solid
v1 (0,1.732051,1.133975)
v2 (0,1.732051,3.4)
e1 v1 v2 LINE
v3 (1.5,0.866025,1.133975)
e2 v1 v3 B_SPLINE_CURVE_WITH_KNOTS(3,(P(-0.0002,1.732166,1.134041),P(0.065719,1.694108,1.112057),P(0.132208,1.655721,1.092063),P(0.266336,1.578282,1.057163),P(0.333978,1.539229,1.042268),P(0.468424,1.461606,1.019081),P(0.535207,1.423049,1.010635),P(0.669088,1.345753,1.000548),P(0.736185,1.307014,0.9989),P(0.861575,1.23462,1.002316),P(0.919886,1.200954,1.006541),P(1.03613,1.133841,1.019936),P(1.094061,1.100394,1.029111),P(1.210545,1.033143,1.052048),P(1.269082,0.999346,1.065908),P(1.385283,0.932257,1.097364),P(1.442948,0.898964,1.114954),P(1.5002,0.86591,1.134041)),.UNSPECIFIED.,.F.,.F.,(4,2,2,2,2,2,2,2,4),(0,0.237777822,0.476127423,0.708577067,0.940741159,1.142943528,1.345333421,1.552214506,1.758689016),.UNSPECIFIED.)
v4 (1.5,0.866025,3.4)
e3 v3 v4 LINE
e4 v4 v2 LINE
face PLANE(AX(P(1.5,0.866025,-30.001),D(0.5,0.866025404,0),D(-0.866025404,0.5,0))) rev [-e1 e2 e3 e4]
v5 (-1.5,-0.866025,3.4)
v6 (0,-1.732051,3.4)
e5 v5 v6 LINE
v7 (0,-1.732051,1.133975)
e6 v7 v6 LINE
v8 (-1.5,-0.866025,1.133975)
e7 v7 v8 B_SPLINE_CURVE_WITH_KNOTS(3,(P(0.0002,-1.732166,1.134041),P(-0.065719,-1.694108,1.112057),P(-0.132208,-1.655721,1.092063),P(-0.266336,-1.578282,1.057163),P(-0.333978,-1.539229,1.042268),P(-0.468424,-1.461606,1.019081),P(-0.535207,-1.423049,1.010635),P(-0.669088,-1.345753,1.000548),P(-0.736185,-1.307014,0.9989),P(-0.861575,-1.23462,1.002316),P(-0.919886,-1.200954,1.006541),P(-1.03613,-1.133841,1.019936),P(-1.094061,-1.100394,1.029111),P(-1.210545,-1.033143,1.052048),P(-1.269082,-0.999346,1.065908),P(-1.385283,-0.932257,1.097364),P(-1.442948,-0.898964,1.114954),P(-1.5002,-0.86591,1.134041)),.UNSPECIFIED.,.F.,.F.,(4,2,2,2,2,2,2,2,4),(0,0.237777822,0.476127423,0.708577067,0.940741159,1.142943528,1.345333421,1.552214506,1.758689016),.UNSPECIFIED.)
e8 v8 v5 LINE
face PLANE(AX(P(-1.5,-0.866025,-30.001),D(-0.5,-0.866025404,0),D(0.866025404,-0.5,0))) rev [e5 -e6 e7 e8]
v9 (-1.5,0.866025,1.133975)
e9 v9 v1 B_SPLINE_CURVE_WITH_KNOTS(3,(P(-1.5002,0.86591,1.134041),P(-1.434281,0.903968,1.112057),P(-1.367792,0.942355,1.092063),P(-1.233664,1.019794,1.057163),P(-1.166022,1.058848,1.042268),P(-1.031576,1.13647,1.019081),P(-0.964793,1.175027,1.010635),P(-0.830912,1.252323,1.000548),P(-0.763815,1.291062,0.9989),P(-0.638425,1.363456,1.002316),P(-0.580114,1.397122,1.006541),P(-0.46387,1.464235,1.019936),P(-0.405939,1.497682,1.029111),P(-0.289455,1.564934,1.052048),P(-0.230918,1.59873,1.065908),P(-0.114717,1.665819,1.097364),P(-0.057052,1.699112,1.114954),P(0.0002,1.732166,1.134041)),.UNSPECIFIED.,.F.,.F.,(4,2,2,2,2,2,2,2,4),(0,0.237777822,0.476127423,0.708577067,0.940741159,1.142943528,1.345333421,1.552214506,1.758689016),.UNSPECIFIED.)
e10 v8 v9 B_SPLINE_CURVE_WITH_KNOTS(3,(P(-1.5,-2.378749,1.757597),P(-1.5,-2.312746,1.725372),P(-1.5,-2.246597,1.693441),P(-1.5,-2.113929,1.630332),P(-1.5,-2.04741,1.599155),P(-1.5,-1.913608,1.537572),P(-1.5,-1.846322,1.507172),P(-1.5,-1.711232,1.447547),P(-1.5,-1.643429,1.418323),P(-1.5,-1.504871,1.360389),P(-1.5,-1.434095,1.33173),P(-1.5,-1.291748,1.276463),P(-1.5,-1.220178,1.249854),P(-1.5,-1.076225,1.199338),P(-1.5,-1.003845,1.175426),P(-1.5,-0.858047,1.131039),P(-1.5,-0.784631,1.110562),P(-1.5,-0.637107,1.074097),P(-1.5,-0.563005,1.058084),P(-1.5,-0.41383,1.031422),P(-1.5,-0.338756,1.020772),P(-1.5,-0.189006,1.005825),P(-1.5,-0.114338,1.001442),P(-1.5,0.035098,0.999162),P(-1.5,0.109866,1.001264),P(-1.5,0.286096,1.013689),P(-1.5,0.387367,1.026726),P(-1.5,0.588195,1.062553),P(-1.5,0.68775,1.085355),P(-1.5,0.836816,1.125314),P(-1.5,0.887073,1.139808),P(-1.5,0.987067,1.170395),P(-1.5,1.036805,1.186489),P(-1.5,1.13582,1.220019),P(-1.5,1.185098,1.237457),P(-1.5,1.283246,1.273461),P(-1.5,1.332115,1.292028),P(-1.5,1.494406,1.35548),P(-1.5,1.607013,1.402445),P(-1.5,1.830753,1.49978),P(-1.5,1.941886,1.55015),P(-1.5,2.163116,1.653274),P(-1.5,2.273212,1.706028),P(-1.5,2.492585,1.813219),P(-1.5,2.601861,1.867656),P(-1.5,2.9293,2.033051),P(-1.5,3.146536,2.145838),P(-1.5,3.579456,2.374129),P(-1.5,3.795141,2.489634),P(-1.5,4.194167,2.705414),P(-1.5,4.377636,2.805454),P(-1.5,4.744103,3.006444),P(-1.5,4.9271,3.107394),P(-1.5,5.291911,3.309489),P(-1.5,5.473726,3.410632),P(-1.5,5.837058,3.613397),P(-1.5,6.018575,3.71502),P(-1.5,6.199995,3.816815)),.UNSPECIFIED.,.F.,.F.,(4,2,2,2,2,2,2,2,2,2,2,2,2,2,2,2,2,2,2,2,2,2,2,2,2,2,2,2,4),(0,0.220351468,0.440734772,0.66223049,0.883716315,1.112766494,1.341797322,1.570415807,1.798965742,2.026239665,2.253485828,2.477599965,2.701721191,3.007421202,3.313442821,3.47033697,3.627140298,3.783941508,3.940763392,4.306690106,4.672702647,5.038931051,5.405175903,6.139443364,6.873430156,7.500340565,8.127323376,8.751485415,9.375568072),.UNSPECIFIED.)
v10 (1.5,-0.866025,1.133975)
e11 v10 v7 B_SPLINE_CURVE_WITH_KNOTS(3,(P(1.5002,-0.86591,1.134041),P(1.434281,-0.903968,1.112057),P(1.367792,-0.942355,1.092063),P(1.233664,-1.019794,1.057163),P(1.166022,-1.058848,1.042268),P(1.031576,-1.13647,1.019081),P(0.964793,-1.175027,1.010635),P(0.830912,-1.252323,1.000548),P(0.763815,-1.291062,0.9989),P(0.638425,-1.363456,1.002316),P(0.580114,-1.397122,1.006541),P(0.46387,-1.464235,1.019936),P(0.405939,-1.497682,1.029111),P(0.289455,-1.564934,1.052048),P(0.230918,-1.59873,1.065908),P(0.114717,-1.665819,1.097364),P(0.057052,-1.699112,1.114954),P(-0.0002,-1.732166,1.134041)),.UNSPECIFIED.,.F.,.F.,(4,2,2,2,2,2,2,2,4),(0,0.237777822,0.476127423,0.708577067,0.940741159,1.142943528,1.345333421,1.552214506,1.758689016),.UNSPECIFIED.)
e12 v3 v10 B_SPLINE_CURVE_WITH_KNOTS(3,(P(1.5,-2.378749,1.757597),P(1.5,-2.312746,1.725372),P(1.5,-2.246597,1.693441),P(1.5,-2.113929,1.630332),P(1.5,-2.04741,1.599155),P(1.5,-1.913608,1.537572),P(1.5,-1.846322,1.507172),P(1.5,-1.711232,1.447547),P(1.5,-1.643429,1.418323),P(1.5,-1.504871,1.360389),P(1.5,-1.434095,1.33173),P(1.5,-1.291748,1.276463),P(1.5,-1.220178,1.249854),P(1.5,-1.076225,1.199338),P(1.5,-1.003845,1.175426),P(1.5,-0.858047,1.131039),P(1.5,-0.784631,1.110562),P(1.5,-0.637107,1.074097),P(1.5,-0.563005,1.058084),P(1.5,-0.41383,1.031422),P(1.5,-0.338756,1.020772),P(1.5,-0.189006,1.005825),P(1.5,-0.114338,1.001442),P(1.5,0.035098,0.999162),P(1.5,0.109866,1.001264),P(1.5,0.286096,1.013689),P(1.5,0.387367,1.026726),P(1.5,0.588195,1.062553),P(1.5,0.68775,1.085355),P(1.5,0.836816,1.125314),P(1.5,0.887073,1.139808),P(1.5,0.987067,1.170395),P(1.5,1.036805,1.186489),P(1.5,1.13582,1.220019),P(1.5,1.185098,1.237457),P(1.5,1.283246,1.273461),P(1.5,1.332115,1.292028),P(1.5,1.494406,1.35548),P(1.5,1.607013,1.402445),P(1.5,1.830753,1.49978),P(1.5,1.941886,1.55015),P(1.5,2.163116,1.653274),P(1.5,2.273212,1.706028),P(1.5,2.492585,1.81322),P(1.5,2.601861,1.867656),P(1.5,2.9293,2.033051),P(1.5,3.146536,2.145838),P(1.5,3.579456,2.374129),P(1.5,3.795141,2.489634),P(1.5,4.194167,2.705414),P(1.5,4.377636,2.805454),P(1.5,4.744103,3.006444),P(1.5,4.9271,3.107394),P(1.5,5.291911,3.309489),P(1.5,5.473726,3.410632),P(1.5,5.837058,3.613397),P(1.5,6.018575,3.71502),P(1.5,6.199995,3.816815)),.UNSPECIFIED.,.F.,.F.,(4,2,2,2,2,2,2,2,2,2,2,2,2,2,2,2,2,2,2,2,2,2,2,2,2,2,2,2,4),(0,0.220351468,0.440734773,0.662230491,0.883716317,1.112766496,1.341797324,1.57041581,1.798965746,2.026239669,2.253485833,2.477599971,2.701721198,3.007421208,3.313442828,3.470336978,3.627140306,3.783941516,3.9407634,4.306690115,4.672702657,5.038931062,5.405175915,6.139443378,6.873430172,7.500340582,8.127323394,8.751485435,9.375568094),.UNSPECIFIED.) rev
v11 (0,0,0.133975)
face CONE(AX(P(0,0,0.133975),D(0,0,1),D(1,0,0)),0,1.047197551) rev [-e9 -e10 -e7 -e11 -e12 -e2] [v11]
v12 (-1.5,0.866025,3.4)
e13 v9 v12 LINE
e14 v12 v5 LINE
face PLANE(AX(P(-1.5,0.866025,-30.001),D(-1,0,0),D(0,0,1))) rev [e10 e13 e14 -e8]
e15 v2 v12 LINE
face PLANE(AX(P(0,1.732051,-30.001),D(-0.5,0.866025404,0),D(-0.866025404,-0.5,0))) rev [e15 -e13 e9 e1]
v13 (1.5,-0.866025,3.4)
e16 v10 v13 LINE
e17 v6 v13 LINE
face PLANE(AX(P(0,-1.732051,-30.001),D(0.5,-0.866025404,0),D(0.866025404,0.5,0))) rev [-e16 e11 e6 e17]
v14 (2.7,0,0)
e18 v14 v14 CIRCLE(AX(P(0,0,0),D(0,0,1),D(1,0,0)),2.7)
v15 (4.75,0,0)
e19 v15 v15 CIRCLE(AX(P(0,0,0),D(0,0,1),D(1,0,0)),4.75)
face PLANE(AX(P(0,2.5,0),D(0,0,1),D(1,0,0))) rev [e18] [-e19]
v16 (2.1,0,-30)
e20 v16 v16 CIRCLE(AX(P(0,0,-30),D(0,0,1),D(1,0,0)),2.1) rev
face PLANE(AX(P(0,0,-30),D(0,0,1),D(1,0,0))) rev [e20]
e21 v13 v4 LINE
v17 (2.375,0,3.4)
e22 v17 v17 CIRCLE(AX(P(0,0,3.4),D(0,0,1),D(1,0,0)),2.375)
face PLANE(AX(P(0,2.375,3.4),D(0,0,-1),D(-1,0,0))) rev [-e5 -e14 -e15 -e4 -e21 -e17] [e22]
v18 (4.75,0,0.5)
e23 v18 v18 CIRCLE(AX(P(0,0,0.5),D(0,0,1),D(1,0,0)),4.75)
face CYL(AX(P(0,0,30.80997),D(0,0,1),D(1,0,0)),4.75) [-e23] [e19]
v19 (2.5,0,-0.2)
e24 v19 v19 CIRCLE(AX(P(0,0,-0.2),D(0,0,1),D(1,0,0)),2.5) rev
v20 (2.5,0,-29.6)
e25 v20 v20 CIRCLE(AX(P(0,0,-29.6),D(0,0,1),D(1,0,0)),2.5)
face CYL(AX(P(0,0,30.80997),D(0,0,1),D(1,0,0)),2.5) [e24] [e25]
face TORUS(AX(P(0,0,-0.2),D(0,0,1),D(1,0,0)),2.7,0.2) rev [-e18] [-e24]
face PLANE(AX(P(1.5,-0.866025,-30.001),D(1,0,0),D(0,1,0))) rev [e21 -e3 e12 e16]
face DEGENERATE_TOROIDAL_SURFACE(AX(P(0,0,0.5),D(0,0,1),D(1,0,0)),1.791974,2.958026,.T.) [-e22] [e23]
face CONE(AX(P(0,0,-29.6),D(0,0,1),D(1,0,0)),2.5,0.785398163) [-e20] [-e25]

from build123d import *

# Parameters (mm, degrees)
CHAMFER1_SIZE      = 0.4
CUT_EXTRUDE1_START = -2.4000001
CUT_EXTRUDE1_DEPTH = 3.4000001
FILLET1_R          = 0.2


with BuildPart() as part:
    # Sketch1 → Revolve1 (revolve)
    with BuildSketch(Plane(origin=(0, 0, 0), x_dir=(0, 0, -1), z_dir=(1, 0, 0)), mode=Mode.PRIVATE) as revolve1_sk:
        with BuildLine():
            Line((30, 0), (30, 2.5))
            Line((30, 2.5), (0, 2.5))
            Line((0, 2.5), (0, 4.75))
            Line((0, 4.75), (-0.5, 4.75))
            ThreePointArc((-0.5, 4.75), (-2.374208166, 4.080480498), (-3.4, 2.375))
            Line((-3.4, 2.375), (-3.4, 0))
            Line((-3.4, 0), (30, 0))
        make_face()
    revolve(revolve1_sk.sketch.rotate(Axis((0, 0, 30.809969789), (0, 0, -1)), 90), axis=Axis((0, 0, 30.809969789), (0, 0, -1)))

    # Chamfer1
    chamfer1_edges = [part.edges().sort_by_distance(p)[0] for p in [
        (-2.5, 0, -30),
    ]]
    chamfer(chamfer1_edges, length=CHAMFER1_SIZE)

    # Sketch2 → Cut-Revolve1 (revolve, cut)
    with BuildSketch(Plane(origin=(0, 0, 0), x_dir=(0, 0, -1), z_dir=(1, 0, 0)), mode=Mode.PRIVATE) as cut_revolve1_sk:
        Polygon((-3.4, 0), (-3.4, 1.5), (-1, 1.5), (-0.133974596, 0), align=None)
    revolve(cut_revolve1_sk.sketch.rotate(Axis((0, 0, 2.452500839), (0, 0, -1)), 90), axis=Axis((0, 0, 2.452500839), (0, 0, -1)), mode=Mode.SUBTRACT)

    # Cut-Extrude1: read off the stored shape, not the designer's step
    # Cut-Extrude1 outline → Cut-Extrude1 (cut)
    with BuildSketch(Plane.XY.offset(3.4).offset(CUT_EXTRUDE1_START)):
        with BuildLine():
            Line((1.5, 0), (1.5, 0.866025404))
            Line((1.5, 0.866025404), (0.750000011, 1.299038099))
            ThreePointArc((0.750000011, 1.299038099), (1.299038109, 0.749999994), (1.5, 0))
        make_face()
        with BuildLine():
            ThreePointArc((-0.749999993, 1.29903811), (1e-08, 1.5), (0.750000011, 1.299038099))
            Line((0.750000011, 1.299038099), (0, 1.732050808))
            Line((0, 1.732050808), (-0.749999993, 1.29903811))
        make_face()
        with BuildLine():
            Line((1.5, -0.866025404), (1.5, 0))
            ThreePointArc((1.5, 0), (1.299038107, -0.749999997), (0.750000005, -1.299038103))
            Line((0.750000005, -1.299038103), (1.5, -0.866025404))
        make_face()
        with BuildLine():
            ThreePointArc((-1.5, 0), (-1.299038104, 0.750000003), (-0.749999993, 1.29903811))
            Line((-0.749999993, 1.29903811), (-1.5, 0.866025404))
            Line((-1.5, 0.866025404), (-1.5, 0))
        make_face()
        with BuildLine():
            Line((0, -1.732050808), (0.750000005, -1.299038103))
            ThreePointArc((0.750000005, -1.299038103), (3e-09, -1.5), (-0.75, -1.299038106))
            Line((-0.75, -1.299038106), (0, -1.732050808))
        make_face()
        with BuildLine():
            ThreePointArc((-0.75, -1.299038106), (-1.299038106, -0.75), (-1.5, 0))
            Line((-1.5, 0), (-1.5, -0.866025404))
            Line((-1.5, -0.866025404), (-0.75, -1.299038106))
        make_face()
    extrude(amount=CUT_EXTRUDE1_DEPTH, mode=Mode.SUBTRACT)

    # Cut-Extrude1 2 outline → Cut-Extrude1 2 (revolve)
    with BuildSketch(Plane.XZ):
        Polygon((1.732050837, 1.133974613), (1.499999957, 0.999999975), (1.732050808, 0.9999999), align=None)
    revolve(axis=Axis((0, 0, 0), (0, 0, 1)))

    # Fillet1
    fillet1_edges = [part.edges().sort_by_distance(p)[0] for p in [
        (-2.5, 0, 0),
    ]]
    fillet(fillet1_edges, radius=FILLET1_R)


solid = part.part
